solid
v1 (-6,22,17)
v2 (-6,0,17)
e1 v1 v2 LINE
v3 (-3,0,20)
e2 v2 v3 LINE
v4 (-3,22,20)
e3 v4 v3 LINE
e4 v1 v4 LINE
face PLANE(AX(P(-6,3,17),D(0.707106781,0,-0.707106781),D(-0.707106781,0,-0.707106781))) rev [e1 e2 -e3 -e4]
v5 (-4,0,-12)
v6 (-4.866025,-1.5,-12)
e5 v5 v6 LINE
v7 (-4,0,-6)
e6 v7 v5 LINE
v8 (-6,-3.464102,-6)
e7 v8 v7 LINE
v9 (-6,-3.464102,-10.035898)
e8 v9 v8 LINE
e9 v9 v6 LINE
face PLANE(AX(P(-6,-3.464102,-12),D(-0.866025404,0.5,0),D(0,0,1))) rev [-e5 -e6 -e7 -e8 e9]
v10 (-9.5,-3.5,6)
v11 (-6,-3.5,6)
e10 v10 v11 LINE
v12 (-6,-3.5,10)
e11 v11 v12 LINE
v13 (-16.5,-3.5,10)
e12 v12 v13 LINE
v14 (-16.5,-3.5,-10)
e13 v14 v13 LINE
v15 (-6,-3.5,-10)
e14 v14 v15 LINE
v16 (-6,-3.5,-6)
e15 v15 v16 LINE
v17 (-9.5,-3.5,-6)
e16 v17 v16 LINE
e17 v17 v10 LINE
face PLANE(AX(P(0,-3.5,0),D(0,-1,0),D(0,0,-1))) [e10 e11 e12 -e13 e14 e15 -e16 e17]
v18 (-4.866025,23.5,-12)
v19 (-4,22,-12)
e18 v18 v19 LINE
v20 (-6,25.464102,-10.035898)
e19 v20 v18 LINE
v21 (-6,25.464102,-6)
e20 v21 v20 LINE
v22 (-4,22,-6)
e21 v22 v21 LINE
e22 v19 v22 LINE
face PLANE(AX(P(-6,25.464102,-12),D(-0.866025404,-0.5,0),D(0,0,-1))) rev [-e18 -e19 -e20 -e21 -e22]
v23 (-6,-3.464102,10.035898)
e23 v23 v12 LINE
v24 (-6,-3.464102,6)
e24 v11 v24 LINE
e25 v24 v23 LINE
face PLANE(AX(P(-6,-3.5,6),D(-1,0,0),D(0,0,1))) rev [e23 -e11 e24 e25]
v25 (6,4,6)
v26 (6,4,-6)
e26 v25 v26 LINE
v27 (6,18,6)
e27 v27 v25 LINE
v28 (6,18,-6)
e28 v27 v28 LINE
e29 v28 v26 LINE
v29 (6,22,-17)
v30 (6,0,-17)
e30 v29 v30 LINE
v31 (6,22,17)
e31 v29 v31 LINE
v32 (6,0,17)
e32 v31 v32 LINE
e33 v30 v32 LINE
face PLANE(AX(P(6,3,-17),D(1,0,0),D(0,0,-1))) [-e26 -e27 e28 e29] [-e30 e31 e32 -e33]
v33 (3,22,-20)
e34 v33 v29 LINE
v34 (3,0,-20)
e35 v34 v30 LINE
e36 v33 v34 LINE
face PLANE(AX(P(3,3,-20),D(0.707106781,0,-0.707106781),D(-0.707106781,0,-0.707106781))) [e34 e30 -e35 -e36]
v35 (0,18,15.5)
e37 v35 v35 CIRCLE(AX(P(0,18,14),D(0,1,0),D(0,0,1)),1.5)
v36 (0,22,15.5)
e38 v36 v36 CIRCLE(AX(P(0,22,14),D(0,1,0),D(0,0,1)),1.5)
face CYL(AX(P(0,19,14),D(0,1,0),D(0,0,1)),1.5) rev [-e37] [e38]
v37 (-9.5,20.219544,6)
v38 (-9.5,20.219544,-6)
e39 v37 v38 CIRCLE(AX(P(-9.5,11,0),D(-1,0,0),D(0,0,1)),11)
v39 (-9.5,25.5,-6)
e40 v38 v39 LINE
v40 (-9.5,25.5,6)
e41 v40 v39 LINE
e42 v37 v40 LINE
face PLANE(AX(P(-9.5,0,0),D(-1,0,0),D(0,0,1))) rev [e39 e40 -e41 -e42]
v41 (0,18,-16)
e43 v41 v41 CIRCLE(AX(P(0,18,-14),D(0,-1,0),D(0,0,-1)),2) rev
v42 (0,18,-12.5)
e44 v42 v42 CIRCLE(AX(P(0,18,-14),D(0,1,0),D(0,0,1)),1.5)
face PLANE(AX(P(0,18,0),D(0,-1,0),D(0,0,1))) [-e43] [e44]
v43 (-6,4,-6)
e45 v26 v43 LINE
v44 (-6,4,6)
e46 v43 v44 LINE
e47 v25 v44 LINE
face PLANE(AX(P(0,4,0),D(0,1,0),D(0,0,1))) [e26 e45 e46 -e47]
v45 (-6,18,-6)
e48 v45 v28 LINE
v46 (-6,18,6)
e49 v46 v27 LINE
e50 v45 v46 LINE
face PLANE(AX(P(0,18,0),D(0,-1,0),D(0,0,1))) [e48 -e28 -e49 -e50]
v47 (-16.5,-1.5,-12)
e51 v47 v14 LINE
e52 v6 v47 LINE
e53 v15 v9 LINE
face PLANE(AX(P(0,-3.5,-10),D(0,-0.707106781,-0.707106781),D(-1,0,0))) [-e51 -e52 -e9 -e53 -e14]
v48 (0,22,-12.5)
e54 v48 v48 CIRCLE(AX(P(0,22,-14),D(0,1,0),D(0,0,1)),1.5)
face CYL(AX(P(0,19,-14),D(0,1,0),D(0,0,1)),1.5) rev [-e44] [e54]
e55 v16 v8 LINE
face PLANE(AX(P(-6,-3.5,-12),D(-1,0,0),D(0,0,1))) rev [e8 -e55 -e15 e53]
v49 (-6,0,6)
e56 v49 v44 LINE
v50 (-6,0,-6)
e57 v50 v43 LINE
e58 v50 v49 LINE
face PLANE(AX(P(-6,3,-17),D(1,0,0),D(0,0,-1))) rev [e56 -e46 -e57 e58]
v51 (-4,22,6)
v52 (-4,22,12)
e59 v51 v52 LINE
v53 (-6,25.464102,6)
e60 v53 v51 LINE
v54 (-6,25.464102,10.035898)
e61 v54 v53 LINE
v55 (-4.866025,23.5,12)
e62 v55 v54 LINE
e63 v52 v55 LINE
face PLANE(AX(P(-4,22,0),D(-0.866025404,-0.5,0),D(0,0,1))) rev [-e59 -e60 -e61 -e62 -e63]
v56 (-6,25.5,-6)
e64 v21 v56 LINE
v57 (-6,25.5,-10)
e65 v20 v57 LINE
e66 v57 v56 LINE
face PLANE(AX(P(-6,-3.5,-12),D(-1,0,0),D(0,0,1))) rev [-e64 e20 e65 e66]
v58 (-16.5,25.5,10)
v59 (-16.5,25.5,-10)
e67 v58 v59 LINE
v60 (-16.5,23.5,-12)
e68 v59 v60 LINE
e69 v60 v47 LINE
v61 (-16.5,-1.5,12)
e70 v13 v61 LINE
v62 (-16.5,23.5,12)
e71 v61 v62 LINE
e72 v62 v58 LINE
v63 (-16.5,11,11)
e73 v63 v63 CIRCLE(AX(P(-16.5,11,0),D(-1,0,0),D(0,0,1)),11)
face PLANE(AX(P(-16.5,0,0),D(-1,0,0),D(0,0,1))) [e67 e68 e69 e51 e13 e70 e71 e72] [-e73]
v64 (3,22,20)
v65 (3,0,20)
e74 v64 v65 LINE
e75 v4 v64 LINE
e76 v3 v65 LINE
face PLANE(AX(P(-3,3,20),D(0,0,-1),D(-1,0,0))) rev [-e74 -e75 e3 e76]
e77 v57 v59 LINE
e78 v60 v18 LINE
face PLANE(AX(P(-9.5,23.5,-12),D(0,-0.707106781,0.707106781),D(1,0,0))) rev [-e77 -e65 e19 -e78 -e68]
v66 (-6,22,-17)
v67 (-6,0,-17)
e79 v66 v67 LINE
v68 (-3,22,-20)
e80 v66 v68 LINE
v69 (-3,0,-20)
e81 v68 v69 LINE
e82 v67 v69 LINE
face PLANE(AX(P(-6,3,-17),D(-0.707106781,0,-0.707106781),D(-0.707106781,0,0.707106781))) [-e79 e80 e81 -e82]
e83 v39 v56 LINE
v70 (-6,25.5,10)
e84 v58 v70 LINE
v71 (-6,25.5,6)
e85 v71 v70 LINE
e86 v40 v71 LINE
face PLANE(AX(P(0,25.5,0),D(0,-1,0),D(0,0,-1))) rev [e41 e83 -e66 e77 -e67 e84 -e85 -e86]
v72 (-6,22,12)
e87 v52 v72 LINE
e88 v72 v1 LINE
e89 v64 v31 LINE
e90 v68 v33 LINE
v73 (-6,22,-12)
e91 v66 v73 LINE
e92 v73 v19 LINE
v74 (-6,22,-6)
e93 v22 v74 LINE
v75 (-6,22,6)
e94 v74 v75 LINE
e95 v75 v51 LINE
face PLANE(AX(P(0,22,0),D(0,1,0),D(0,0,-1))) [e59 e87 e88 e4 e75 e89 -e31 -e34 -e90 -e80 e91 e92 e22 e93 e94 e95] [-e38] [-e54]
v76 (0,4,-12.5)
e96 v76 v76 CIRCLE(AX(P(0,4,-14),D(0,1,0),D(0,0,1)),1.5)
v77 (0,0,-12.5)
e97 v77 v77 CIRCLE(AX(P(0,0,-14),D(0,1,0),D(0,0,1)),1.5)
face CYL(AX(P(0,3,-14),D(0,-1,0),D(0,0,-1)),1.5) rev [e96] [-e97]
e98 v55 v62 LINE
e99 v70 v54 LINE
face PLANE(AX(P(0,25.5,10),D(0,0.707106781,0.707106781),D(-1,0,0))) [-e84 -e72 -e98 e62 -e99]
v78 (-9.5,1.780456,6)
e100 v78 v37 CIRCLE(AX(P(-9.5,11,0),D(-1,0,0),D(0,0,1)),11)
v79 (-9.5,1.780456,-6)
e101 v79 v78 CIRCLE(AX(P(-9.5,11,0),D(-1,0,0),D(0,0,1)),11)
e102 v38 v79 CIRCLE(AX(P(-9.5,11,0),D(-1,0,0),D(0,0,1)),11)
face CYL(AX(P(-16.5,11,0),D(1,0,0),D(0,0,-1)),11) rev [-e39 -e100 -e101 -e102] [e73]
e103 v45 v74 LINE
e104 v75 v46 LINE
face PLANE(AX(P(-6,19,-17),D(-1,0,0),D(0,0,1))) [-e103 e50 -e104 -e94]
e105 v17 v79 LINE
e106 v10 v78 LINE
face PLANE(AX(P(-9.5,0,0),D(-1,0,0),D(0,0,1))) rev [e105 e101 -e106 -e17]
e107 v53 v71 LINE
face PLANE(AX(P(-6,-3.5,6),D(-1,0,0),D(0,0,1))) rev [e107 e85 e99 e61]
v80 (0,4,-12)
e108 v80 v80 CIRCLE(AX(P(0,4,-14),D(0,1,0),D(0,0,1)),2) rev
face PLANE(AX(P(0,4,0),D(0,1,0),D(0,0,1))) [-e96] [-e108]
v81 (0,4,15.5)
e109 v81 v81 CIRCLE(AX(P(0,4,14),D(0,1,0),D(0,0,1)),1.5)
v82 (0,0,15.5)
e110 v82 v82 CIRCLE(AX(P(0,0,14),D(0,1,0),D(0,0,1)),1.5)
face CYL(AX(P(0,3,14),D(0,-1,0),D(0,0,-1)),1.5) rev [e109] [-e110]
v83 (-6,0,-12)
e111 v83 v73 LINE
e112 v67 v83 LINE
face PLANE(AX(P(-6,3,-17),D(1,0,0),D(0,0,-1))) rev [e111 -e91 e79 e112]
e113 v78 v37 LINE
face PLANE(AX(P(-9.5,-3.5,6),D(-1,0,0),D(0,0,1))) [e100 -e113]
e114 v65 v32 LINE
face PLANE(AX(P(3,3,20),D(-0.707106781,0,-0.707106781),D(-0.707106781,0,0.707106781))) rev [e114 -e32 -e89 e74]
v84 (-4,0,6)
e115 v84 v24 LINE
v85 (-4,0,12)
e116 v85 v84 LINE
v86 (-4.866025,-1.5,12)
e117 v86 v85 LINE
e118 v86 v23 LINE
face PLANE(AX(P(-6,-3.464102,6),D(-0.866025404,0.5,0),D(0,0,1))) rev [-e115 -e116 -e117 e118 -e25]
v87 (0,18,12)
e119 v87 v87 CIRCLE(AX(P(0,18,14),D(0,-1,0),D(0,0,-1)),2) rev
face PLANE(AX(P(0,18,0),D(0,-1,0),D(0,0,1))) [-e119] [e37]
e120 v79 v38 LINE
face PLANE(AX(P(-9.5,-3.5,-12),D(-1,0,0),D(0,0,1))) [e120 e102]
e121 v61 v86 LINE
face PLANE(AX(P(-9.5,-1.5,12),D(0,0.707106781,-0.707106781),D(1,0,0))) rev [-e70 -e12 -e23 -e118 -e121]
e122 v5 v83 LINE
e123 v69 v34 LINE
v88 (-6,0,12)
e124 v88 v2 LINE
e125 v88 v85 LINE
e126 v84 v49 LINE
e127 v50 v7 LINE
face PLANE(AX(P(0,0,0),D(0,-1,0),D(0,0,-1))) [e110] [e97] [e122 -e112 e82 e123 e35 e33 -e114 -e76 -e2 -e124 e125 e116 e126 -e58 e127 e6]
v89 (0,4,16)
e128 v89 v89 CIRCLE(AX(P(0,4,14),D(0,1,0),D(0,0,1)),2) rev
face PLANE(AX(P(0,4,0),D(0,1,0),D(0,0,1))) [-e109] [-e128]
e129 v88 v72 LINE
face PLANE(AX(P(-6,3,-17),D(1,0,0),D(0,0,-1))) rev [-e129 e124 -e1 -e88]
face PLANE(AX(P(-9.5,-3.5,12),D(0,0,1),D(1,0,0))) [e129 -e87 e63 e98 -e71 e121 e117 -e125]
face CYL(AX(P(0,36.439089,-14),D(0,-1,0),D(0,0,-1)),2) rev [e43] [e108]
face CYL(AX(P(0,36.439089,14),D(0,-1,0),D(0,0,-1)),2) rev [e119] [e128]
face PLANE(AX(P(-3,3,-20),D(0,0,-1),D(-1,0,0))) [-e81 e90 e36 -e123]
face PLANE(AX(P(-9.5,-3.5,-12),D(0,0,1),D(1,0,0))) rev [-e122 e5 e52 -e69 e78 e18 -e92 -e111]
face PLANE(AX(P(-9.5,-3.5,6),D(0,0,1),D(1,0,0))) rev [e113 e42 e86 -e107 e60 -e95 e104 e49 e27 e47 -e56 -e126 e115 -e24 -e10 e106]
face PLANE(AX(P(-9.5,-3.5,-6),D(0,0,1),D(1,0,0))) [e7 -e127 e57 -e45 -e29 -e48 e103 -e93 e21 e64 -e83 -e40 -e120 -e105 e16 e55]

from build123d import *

# Parameters (mm, degrees)
SKETCH1_R           = 1.5
BOSS_EXTRUDE1_DEPTH = 3
BOSS_EXTRUDE2_START = 22.5
SKETCH2_W           = 3.5
SKETCH2_H           = 6
BOSS_EXTRUDE2_DEPTH = 29
SKETCH4_R           = 1.5
BOSS_EXTRUDE5_DEPTH = 1
CHAMFER2_SIZE       = 2
CHAMFER2_SIZE2      = 3.464101615
SKETCH3_W           = 24
SKETCH3_H           = 29
SKETCH3_R           = 11
BOSS_EXTRUDE4_DEPTH = 7
CHAMFER3_SIZE       = 2
SKETCH5_R           = 2
BOSS_EXTRUDE6_DEPTH = 14


# Read off the part's stored shape, not the designer's step: Mirror1
with BuildPart() as part:
    # Sketch1 → Boss-Extrude1 (new body)
    with BuildSketch(Plane(origin=(0, 0, 0), x_dir=(1, 0, 0), z_dir=(0, 1, 0))):
        Polygon((-6, 17), (-3, 20), (3, 20), (6, 17), (6, -17), (3, -20), (-3, -20), (-6, -17), align=None)
        with Locations(Location((0, 14, 0), (0, 0, 270))):
            Circle(SKETCH1_R, mode=Mode.SUBTRACT)
        with Locations(Location((0, -14, 0), (0, 0, 270))):
            Circle(SKETCH1_R, mode=Mode.SUBTRACT)
    extrude(amount=BOSS_EXTRUDE1_DEPTH)

    # Sketch2 → Boss-Extrude2 (add)
    with BuildSketch(Plane(origin=(0, 3, 0), x_dir=(1, 0, 0), z_dir=(0, 1, 0)).offset(BOSS_EXTRUDE2_START)):
        with Locations((-7.75, 9)):
            Rectangle(SKETCH2_W, SKETCH2_H)
        with Locations((-7.75, -9)):
            Rectangle(SKETCH2_W, SKETCH2_H)
    extrude(amount=-BOSS_EXTRUDE2_DEPTH)

    # Sketch4 → Boss-Extrude5 (add)
    with BuildSketch(Plane(origin=(0, 3, 0), x_dir=(1, 0, 0), z_dir=(0, 1, 0))):
        Polygon((-3, 20), (-6, 17), (-6, 12), (-6, 6), (-6, -6), (-6, -12), (-6, -17), (-3, -20), (3, -20), (6, -17), (6, 17), (3, 20), align=None)
        with Locations(Location((0, 14, 0), (0, 0, 270))):
            Circle(SKETCH4_R, mode=Mode.SUBTRACT)
        with Locations(Location((0, -14, 0), (0, 0, 270))):
            Circle(SKETCH4_R, mode=Mode.SUBTRACT)
    extrude(amount=BOSS_EXTRUDE5_DEPTH)

    # Chamfer2
    chamfer2_edges = [part.edges().sort_by_distance(p)[0] for p in [
        (-6, 0, -9),
        (-6, 0, 9),
    ]]
    chamfer2_side = [part.faces().sort_by_distance(p)[0] for p in [
        (0, 0, 0),
    ]]
    chamfer(chamfer2_edges, length=CHAMFER2_SIZE, length2=CHAMFER2_SIZE2, reference=chamfer2_side[0])

    # Sketch3 → Boss-Extrude4 (add)
    with BuildSketch(Plane.ZY.offset(9.5)):
        with Locations((0, 11)):
            Rectangle(SKETCH3_W, SKETCH3_H)
        with Locations(Location((0, 11, 0), (0, 0, 236.944268849))):
            Circle(SKETCH3_R, mode=Mode.SUBTRACT)
    extrude(amount=BOSS_EXTRUDE4_DEPTH)

    # Chamfer3
    chamfer3_edges = [part.edges().sort_by_distance(p)[0] for p in [
        (-11.25, 25.5, -12),
        (-11.25, -3.5, -12),
        (-11.25, -3.5, 12),
        (-11.25, 25.5, 12),
    ]]
    chamfer(chamfer3_edges, length=CHAMFER3_SIZE)

    # Mirror1: part across plane


with BuildPart() as part_1:
    add(part.part)
    add(part.part.mirror(Plane(origin=(0, 11, 0), x_dir=(0, 0, 1), z_dir=(0, -1, 0))))

    # Sketch5 → Boss-Extrude6 (add)
    # profile 1 of 2: a face of its own
    with BuildSketch(Plane(origin=(0, 4, 0), x_dir=(1, 0, 0), z_dir=(0, 1, 0))):
        Polygon((6, -6), (-6, -6), (-6, -17), (-3, -20), (3, -20), (6, -17), align=None)
        with Locations(Location((0, -14, 0), (0, 0, 90))):
            Circle(SKETCH5_R, mode=Mode.SUBTRACT)
    # profile 2 of 2: a face of its own
    with BuildSketch(Plane(origin=(0, 4, 0), x_dir=(1, 0, 0), z_dir=(0, 1, 0))):
        Polygon((-6, 17), (-6, 6), (6, 6), (6, 17), (3, 20), (-3, 20), align=None)
        with Locations(Location((0, 14, 0), (0, 0, 90))):
            Circle(SKETCH5_R, mode=Mode.SUBTRACT)
    extrude(amount=BOSS_EXTRUDE6_DEPTH)


solid = part_1.part
